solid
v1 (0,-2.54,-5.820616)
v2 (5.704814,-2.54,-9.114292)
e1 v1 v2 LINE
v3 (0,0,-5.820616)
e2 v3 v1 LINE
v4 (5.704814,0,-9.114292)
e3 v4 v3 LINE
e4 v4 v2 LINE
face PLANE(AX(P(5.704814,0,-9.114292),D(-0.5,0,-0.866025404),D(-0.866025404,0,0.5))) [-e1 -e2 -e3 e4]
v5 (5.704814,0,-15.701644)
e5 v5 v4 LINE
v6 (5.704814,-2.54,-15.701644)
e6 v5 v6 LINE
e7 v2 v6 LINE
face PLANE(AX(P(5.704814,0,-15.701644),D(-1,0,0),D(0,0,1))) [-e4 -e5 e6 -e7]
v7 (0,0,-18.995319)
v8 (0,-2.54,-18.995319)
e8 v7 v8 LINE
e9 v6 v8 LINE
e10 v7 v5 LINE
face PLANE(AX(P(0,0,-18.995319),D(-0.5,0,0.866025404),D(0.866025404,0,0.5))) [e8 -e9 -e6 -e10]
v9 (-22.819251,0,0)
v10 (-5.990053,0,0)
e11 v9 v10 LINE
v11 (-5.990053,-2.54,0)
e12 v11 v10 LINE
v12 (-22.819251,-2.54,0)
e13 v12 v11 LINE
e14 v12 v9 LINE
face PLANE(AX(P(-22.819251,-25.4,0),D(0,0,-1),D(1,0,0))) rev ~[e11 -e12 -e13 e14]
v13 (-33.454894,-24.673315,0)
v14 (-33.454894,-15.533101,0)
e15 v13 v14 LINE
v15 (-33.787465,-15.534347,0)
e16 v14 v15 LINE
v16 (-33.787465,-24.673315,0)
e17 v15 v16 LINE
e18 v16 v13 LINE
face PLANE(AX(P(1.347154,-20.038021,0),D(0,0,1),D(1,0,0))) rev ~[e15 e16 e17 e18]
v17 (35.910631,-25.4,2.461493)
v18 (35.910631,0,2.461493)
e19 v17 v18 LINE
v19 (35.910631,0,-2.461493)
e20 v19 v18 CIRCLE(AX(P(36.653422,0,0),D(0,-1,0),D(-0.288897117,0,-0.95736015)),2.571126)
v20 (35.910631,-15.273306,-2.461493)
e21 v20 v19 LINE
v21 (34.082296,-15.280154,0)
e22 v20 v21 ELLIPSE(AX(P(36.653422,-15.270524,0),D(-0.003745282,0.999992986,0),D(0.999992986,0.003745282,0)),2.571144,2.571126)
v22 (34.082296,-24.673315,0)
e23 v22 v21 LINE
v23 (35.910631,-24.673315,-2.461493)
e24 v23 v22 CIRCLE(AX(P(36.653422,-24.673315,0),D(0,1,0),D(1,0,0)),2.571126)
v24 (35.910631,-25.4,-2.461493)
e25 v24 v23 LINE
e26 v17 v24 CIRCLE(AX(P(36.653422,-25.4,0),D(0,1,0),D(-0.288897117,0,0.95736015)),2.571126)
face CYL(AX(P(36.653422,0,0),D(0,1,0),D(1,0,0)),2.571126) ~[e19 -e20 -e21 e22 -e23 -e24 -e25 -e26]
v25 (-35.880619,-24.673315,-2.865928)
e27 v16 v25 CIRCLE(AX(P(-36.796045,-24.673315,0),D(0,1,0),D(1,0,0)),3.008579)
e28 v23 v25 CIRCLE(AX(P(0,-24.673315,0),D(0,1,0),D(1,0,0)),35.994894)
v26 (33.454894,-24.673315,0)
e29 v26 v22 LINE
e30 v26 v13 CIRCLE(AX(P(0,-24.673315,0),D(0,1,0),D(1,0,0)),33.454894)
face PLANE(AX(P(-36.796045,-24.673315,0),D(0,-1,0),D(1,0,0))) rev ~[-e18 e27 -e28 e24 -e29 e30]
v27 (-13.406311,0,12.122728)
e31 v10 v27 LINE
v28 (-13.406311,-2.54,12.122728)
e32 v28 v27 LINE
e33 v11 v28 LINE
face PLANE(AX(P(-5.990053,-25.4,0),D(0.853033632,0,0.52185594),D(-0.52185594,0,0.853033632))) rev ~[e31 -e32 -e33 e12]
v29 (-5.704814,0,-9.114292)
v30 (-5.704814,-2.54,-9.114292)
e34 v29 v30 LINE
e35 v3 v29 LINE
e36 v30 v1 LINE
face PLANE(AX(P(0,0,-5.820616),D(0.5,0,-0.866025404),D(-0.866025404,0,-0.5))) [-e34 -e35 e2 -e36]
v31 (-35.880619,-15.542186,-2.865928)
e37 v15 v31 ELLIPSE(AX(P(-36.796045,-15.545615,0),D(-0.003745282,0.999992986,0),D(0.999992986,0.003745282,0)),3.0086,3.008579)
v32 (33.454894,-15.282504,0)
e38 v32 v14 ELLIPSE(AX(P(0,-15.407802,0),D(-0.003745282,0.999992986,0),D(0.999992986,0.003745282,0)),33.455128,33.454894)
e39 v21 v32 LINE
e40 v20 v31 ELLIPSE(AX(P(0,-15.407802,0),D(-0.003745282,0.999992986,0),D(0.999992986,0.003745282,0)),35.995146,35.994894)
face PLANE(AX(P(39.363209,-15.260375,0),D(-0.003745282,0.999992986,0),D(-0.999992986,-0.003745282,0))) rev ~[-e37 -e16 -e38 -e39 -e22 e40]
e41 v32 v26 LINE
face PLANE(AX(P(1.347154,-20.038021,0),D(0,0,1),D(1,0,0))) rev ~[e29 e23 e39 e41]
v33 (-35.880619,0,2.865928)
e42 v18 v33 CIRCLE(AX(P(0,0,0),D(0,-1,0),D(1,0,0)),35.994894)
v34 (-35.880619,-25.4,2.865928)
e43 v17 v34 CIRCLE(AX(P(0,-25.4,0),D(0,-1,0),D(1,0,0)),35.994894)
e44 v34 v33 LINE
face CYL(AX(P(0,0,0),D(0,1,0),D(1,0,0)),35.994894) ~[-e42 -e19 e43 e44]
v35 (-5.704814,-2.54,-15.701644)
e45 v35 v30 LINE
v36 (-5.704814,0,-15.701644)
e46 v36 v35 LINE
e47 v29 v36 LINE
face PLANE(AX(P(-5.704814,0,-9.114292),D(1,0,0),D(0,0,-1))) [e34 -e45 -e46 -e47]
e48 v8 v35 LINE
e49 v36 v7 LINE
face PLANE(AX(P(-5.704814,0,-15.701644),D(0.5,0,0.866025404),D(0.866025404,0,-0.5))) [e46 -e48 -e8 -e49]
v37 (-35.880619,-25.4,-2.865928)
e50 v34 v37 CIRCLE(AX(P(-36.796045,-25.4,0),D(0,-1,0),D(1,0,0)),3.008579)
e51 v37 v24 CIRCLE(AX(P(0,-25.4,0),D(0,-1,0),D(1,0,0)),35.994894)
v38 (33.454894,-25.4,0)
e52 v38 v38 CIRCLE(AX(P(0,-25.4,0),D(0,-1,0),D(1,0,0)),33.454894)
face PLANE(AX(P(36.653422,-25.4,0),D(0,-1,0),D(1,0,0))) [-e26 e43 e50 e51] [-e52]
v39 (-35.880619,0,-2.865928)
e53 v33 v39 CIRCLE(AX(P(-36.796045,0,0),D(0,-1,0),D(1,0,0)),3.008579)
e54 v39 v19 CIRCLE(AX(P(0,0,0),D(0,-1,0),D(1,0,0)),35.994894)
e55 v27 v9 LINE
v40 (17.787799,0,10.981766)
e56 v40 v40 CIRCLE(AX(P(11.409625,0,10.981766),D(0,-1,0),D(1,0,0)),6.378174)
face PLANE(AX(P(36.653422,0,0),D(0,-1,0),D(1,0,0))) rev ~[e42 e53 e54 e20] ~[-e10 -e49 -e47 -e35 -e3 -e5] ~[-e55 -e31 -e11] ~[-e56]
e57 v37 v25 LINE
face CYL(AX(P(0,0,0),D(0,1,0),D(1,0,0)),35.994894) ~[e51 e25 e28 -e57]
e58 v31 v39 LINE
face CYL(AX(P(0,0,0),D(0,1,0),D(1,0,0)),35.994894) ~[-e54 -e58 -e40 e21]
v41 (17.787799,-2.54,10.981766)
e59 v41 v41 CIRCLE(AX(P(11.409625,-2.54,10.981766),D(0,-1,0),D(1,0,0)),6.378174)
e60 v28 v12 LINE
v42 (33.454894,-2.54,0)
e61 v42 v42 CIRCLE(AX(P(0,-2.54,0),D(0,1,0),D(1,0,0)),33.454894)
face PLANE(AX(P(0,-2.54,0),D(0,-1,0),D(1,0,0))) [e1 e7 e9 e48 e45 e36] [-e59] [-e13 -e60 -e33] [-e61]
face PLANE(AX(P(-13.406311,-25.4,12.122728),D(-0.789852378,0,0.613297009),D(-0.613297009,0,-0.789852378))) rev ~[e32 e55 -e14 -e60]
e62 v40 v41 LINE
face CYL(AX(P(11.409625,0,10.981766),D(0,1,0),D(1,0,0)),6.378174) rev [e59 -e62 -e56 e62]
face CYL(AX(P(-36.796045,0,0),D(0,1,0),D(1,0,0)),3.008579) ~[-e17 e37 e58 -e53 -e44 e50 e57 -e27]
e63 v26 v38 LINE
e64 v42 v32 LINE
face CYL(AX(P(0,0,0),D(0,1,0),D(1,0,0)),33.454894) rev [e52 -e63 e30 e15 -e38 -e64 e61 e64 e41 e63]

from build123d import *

# Parameters (mm, degrees)
F0_R      = 35.9948936704
F1_DEPTH  = 25.4
F3_T      = -2.54
F5_DEPTH  = 25.401
F6_R      = 6.3781739211
F7_DEPTH  = 2.54
F9_DEPTH  = 114
F10_W     = 18.6832621694
F10_H     = 6.5605333075
F11_DEPTH = 114
F13_DEPTH = 114
F15_DEPTH = 114
F17_DEPTH = 25.401
F19_DEPTH = 35.9958936704
F20_R     = 3.0085790952
F21_DEPTH = 25.4
F22_R     = 2.5711256323
F23_DEPTH = 25.4


# Not quite as in the source:
# - an extrude ends at something that could not be found from the text; its depth is read off the source's solid


with BuildPart() as f1:
    # F0 (on Front) → F1 (new body)
    with BuildSketch(Plane.XZ):
        Circle(F0_R)
    extrude(amount=F1_DEPTH)

    # F3
    f3_openings = [f1.faces().sort_by_distance(p)[0] for p in [
        (0, -25.4, 0),
    ]]
    offset(amount=F3_T, openings=f3_openings)

    # F4 (on face) → F5 (cut, through all)
    with BuildSketch(Plane.XZ.offset(25.4)):
        Polygon((-13.4063111618, 12.1227279305), (-22.8192508221, 0), (-5.9900530614, 0), align=None)
    extrude(amount=-F5_DEPTH, mode=Mode.SUBTRACT)

    # F6 (on Front) → F7 (cut, through all)
    with BuildSketch(Plane.XZ):
        with Locations((11.409625411, 10.9817655757)):
            Circle(F6_R)
    extrude(amount=F7_DEPTH, mode=Mode.SUBTRACT)

    # F8 (on Front) → F9 (cut, through all)
    with BuildSketch(Plane.XZ):
        Polygon((7.8015748957, -15.0106055726), (4.1785330897, -8.0938870023), (-3.623041806, -7.7731739601), (-7.8015748957, -14.3691794883), (-4.1785330897, -21.2858980586), (3.623041806, -21.6066111008), align=None)
    extrude(amount=-F9_DEPTH, mode=Mode.SUBTRACT)

    # F10 (on Front) → F11 (cut, through all)
    with BuildSketch(Plane.XZ):
        with Locations((-9.3416310847, -10.1260426454)):
            Rectangle(F10_W, F10_H)
    extrude(amount=-F11_DEPTH, mode=Mode.SUBTRACT)

    # F12 (on Front) → F13 (cut, through all)
    with BuildSketch(Plane.XZ):
        Polygon((-16.4013374597, -20.2520862222), (12.4079678208, -20.2520862222), (14.9751342833, -13.9767900109), (-16.4013374597, -13.9767900109), align=None)
    extrude(amount=-F13_DEPTH, mode=Mode.SUBTRACT)

    # F14 (on Front) → F15 (cut, through all)
    with BuildSketch(Plane.XZ):
        Polygon((8.4161829098, -14.604808726), (4.1344067188, -7.3587224255), (-4.281776191, -7.4438062299), (-8.4161829098, -14.7749763349), (-4.1344067188, -22.0210626354), (4.281776191, -21.935978831), align=None)
    extrude(amount=-F15_DEPTH, mode=Mode.SUBTRACT)

    # F16 (on Front) → F17 (cut, through all)
    with BuildSketch(Plane.XZ):
        Polygon((5.7048136368, -15.7016435097), (5.7048136368, -9.1142921319), (0, -5.820616443), (-5.7048136368, -9.1142921319), (-5.7048136368, -15.7016435097), (0, -18.9953191986), align=None)
    extrude(amount=F17_DEPTH, mode=Mode.SUBTRACT)

    # F18 (on Top) → F19 (cut, through all)
    with BuildSketch(Plane.XY):
        Polygon((39.3632091582, -15.2603751048), (-36.7960445583, -15.5456149951), (-36.7960445583, -24.6733147651), (39.3632091582, -24.6733147651), align=None)
    extrude(amount=-F19_DEPTH, mode=Mode.SUBTRACT)

    # F20 (on Front) → F21 (join)
    with BuildSketch(Plane.XZ):
        with Locations((-36.7960445583, 0)):
            Circle(F20_R)
    extrude(amount=F21_DEPTH)

    # F22 (on Front) → F23 (join)
    with BuildSketch(Plane.XZ):
        with Locations((36.6534218192, 0)):
            Circle(F22_R)
    extrude(amount=F23_DEPTH)


solid = f1.part
